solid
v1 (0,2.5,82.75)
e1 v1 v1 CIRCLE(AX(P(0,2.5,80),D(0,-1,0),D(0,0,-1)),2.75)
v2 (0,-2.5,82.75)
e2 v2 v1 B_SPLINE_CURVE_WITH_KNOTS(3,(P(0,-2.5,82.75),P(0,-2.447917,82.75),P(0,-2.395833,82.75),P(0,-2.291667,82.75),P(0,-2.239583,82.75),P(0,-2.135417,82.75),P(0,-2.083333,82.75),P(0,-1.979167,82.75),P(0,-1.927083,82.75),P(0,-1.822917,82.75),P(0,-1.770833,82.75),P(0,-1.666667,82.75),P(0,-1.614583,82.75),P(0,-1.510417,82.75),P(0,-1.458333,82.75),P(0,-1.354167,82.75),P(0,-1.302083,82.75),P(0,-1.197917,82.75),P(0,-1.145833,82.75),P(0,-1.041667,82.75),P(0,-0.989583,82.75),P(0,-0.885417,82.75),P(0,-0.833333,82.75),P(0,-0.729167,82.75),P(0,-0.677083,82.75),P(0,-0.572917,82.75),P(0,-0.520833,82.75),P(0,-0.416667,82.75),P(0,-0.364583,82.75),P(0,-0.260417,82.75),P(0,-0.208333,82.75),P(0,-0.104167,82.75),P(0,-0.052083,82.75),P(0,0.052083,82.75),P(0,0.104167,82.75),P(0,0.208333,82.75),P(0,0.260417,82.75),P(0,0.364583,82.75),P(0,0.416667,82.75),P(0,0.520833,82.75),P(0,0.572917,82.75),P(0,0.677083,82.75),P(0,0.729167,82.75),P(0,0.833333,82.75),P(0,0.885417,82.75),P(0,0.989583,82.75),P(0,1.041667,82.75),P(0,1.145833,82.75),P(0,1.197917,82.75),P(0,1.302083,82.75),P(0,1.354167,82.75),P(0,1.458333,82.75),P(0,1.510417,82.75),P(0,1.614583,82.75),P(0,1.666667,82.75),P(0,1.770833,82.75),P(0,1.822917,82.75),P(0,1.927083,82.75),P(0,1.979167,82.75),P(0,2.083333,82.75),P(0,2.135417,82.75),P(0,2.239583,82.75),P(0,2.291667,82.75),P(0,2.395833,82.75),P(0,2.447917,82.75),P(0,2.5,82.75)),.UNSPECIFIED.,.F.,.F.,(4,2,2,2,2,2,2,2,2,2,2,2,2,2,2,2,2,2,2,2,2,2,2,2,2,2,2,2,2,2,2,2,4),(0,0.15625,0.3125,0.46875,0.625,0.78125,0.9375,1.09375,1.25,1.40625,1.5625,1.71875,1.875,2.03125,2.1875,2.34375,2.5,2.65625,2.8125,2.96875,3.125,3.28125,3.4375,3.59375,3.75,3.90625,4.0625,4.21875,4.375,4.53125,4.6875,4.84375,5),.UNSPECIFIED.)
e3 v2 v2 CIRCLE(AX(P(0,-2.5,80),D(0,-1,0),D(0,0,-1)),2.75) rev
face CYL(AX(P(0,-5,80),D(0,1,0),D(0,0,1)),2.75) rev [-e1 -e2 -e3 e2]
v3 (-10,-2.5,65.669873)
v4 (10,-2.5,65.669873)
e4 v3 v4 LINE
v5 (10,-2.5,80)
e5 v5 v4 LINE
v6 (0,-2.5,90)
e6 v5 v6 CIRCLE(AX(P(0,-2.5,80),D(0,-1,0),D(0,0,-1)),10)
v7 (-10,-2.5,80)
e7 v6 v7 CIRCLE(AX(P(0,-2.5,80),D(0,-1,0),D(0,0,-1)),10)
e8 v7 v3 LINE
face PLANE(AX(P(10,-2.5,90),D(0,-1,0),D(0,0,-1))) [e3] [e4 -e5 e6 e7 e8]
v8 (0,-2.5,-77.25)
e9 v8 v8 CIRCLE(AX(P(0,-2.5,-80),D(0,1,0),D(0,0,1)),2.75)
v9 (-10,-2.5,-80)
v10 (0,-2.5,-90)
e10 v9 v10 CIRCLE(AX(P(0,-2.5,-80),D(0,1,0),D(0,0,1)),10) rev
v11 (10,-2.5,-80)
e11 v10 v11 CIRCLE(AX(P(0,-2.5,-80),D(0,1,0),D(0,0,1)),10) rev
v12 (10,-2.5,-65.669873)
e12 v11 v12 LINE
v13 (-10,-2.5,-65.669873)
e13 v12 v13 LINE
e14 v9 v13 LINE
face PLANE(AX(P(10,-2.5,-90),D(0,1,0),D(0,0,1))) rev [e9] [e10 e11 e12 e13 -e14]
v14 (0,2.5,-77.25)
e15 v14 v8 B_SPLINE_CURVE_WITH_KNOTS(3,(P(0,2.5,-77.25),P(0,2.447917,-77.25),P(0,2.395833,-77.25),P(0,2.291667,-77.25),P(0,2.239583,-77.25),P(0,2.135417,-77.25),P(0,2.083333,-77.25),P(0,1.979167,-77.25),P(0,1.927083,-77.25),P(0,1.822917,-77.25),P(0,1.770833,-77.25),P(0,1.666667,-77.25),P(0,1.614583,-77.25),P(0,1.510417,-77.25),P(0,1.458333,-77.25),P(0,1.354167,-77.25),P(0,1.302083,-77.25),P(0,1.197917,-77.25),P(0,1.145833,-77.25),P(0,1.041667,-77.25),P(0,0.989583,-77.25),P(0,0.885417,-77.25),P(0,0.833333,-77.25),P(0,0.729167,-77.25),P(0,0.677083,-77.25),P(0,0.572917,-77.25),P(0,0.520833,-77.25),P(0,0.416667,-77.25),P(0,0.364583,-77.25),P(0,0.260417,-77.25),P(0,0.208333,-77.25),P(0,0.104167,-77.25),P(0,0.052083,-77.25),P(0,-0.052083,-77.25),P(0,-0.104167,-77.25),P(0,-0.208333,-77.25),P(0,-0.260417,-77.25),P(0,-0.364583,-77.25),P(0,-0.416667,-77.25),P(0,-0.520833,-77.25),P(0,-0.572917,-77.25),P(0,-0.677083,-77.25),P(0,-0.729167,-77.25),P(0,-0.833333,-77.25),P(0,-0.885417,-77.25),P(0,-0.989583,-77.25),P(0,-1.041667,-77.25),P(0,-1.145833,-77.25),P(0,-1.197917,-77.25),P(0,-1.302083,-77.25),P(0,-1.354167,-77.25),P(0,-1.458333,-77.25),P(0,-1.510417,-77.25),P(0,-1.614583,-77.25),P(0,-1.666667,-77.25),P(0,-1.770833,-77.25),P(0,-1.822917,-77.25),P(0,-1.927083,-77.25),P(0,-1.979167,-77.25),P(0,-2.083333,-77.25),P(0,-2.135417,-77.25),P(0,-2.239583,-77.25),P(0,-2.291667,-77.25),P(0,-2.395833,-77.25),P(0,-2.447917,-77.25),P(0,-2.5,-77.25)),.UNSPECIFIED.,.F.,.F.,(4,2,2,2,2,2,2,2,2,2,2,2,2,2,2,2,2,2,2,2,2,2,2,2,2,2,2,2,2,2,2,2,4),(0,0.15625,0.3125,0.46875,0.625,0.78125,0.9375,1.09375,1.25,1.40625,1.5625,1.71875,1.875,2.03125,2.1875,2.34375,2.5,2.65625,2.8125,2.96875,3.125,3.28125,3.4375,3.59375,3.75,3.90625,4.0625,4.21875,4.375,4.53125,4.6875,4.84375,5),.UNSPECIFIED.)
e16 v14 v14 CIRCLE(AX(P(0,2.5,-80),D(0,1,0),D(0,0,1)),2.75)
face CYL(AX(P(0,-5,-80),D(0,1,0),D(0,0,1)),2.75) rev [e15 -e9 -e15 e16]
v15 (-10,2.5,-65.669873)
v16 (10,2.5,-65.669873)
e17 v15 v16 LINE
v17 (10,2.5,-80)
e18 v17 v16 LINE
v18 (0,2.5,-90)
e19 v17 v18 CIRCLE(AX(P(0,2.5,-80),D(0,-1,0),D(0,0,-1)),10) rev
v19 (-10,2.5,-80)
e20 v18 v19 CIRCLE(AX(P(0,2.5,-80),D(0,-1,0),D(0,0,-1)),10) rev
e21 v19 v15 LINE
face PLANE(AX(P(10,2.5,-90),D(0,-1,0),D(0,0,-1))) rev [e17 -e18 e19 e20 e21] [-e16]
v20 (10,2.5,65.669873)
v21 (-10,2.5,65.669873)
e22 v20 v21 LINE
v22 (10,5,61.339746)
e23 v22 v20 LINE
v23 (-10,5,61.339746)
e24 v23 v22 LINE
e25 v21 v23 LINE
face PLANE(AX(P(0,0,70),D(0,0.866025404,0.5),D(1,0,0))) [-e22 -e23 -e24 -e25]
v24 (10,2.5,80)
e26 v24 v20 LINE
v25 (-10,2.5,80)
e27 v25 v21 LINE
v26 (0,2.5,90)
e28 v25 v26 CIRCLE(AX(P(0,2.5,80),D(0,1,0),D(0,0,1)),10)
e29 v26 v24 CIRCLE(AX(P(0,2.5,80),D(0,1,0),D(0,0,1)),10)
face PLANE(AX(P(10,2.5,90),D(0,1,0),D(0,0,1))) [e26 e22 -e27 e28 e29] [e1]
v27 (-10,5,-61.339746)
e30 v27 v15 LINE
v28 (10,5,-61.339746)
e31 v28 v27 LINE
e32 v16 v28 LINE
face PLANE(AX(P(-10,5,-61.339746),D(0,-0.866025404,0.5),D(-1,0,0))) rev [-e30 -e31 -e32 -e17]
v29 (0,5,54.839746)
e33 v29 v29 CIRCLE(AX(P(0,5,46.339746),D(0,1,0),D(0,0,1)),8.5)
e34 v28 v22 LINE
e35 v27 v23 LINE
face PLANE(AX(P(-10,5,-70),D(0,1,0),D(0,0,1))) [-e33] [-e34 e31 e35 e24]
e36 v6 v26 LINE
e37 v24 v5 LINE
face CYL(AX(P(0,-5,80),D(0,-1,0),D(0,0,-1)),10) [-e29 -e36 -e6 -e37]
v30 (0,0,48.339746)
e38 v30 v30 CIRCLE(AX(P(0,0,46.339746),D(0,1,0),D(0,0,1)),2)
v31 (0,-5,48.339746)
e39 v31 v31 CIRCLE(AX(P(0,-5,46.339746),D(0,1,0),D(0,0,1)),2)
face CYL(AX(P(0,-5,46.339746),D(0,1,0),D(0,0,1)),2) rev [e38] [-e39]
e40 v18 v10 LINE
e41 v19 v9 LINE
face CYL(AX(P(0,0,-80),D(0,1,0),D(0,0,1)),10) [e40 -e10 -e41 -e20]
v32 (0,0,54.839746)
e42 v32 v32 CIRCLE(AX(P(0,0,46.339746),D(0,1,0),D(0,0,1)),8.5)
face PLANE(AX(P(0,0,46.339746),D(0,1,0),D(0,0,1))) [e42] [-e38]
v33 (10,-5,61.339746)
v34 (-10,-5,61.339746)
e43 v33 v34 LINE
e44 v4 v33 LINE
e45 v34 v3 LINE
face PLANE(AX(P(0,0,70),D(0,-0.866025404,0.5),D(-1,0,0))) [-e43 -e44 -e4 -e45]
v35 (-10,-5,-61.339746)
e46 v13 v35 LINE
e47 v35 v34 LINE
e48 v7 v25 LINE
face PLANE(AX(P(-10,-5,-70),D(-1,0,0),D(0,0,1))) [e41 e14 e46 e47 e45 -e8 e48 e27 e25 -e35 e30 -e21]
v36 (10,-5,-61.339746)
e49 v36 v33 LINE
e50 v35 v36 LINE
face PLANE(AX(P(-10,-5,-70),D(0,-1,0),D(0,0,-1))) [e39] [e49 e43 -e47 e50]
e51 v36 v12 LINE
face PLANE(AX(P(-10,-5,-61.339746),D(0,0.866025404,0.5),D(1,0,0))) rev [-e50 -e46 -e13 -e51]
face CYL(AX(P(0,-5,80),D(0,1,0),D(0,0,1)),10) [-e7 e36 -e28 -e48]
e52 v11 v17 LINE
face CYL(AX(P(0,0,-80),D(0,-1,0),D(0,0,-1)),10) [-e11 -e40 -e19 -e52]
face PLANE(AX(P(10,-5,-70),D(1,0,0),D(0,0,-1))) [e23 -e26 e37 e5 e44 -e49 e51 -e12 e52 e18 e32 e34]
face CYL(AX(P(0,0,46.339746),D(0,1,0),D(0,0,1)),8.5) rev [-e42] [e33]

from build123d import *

# Parameters (mm, degrees)
BOSS_EXTRUDE1_DEPTH      = 70
BOSS_EXTRUDE1_DEPTH_BACK = 70
SKETCH1_W                = 20
SKETCH1_H                = 10
SKETCH3_W                = 20
SKETCH3_H                = 5
BOSS_EXTRUDE2_DEPTH      = 20
FILLET1_R                = 10
SKETCH4_R                = 2.75
CUT_EXTRUDE1_DEPTH       = 91.863909227
FILLET1_OF_MIRROR1_R     = 10
CHAMFER1_SIZE            = 8.660254038
CHAMFER1_SIZE_2          = 5
SKETCH5_R                = 8.5
CUT_EXTRUDE2_DEPTH       = 5
CUT_EXTRUDE3_DEPTH       = 91.691785736
CUT_EXTRUDE3_DEPTH_BACK  = 91.691785736
SKETCH6_R                = 2


# Some blends are built 0.0001 mm under size
with BuildPart() as part:
    # Sketch1 → Boss-Extrude1 (new, two sides: drawn at the far end of the back side and taken through both)
    with BuildSketch(Plane.XY.offset(-BOSS_EXTRUDE1_DEPTH_BACK)):
        Rectangle(SKETCH1_W, SKETCH1_H)
    extrude(amount=BOSS_EXTRUDE1_DEPTH + BOSS_EXTRUDE1_DEPTH_BACK)

    # Sketch3 → Boss-Extrude2 (add)
    with BuildSketch(Plane(origin=(0, 0, -70), x_dir=(-1, 0, 0), z_dir=(0, 0, -1))):
        Rectangle(SKETCH3_W, SKETCH3_H)
    boss_extrude2 = extrude(amount=BOSS_EXTRUDE2_DEPTH)

    # Fillet1
    fillet1_edges = [part.edges().sort_by_distance(p)[0] for p in [
        (-10, 0, -90),
        (10, 0, -90),
    ]]
    fillet(fillet1_edges, radius=FILLET1_R - 0.0001)  # a hair under: the kernel refuses the full size

    # Sketch4 → Cut-Extrude1 (cut, through all)
    with BuildSketch(Plane(origin=(0, 2.5, 0), x_dir=(1, 0, 0), z_dir=(0, 1, 0))):
        with Locations(Location((0, 80, 0), (0, 0, 270))):
            Circle(SKETCH4_R)
    cut_extrude1 = extrude(amount=-CUT_EXTRUDE1_DEPTH, mode=Mode.SUBTRACT)

    # Mirror1: Boss-Extrude2, Cut-Extrude1 across plane
    add(boss_extrude2.mirror(Plane.XY))
    add(cut_extrude1.mirror(Plane.XY), mode=Mode.SUBTRACT)

    # Fillet1 of Mirror1
    fillet1_of_mirror1_edges = [part.edges().sort_by_distance(p)[0] for p in [
        (-10, 0, 90),
        (10, 0, 90),
    ]]
    fillet(fillet1_of_mirror1_edges, radius=FILLET1_OF_MIRROR1_R - 0.0001)  # a hair under: the kernel refuses the full size

    # Chamfer1
    # the kernel refuses this chamfer: 8.660254038, 5 mm, written as the material it takes off along each edge
    with BuildSketch(Plane(origin=(32.404819853, 5, -70), x_dir=(0, 0.019326765612700594, 0.999813220622208), z_dir=(-1, 0, 0))) as chamfer1_piece_1_section:
        Polygon((CHAMFER1_SIZE * 0.999813220604, -CHAMFER1_SIZE * 0.0193267656124), (-CHAMFER1_SIZE_2 * 0.0193267656127, -CHAMFER1_SIZE_2 * 0.999813220622), (0, 0), align=None)
    chamfer1_piece_1 = extrude(amount=64.809639706, mode=Mode.PRIVATE)
    chamfer1_piece_1 = split(chamfer1_piece_1, bisect_by=Plane(origin=(0, 2.5, -66.539331058), z_dir=(0, 1, 0)), keep=Keep.TOP, mode=Mode.PRIVATE)
    add(chamfer1_piece_1, mode=Mode.SUBTRACT)
    with BuildSketch(Plane(origin=(-32.404819853, -5, -70), x_dir=(0, -0.019326765612700594, 0.999813220622208), z_dir=(1, 0, 0))) as chamfer1_piece_2_section:
        Polygon((CHAMFER1_SIZE * 0.999813220604, -CHAMFER1_SIZE * 0.0193267656124), (-CHAMFER1_SIZE_2 * 0.0193267656127, -CHAMFER1_SIZE_2 * 0.999813220622), (0, 0), align=None)
    chamfer1_piece_2 = extrude(amount=64.809639706, mode=Mode.PRIVATE)
    chamfer1_piece_2 = split(chamfer1_piece_2, bisect_by=Plane(origin=(0, -2.5, -66.539331058), z_dir=(0, -1, 0)), keep=Keep.TOP, mode=Mode.PRIVATE)
    add(chamfer1_piece_2, mode=Mode.SUBTRACT)
    with BuildSketch(Plane(origin=(-32.404819853, -5, 70), x_dir=(0, 0.9983227437537926, 0.05789386240267045), z_dir=(1, 0, 0))) as chamfer1_piece_3_section:
        Polygon((CHAMFER1_SIZE_2 * 0.998322743754, -CHAMFER1_SIZE_2 * 0.0578938624027), (-CHAMFER1_SIZE * 0.0578938624016, -CHAMFER1_SIZE * 0.998322743736), (0, 0), align=None)
    chamfer1_piece_3 = extrude(amount=64.809639706, mode=Mode.PRIVATE)
    chamfer1_piece_3 = split(chamfer1_piece_3, bisect_by=Plane(origin=(0, -2.5, 66.539331058), z_dir=(0, -1, 0)), keep=Keep.TOP, mode=Mode.PRIVATE)
    add(chamfer1_piece_3, mode=Mode.SUBTRACT)
    with BuildSketch(Plane(origin=(32.404819853, 5, 70), x_dir=(0, -0.9983227437537926, 0.05789386240267045), z_dir=(-1, 0, 0))) as chamfer1_piece_4_section:
        Polygon((CHAMFER1_SIZE_2 * 0.998322743754, -CHAMFER1_SIZE_2 * 0.0578938624027), (-CHAMFER1_SIZE * 0.0578938624016, -CHAMFER1_SIZE * 0.998322743736), (0, 0), align=None)
    chamfer1_piece_4 = extrude(amount=64.809639706, mode=Mode.PRIVATE)
    chamfer1_piece_4 = split(chamfer1_piece_4, bisect_by=Plane(origin=(0, 2.5, 66.539331058), z_dir=(0, 1, 0)), keep=Keep.TOP, mode=Mode.PRIVATE)
    add(chamfer1_piece_4, mode=Mode.SUBTRACT)

    # Sketch5 → Cut-Extrude2 (cut)
    with BuildSketch(Plane(origin=(0, 5, 0), x_dir=(1, 0, 0), z_dir=(0, 1, 0))):
        with Locations(Location((0, -46.339745962, 0), (0, 0, 270))):
            Circle(SKETCH5_R)
    extrude(amount=-CUT_EXTRUDE2_DEPTH, mode=Mode.SUBTRACT)

    # Sketch6 → Cut-Extrude3 (cut, two sides: drawn at the far end of the back side and taken through both)
    with BuildSketch(Plane(origin=(0, 0, 0), x_dir=(1, 0, 0), z_dir=(0, 1, 0)).offset(-CUT_EXTRUDE3_DEPTH_BACK)):
        with Locations(Location((0, -46.339745962, 0), (0, 0, 270))):
            Circle(SKETCH6_R)
    extrude(amount=CUT_EXTRUDE3_DEPTH + CUT_EXTRUDE3_DEPTH_BACK, mode=Mode.SUBTRACT)


solid = part.part
